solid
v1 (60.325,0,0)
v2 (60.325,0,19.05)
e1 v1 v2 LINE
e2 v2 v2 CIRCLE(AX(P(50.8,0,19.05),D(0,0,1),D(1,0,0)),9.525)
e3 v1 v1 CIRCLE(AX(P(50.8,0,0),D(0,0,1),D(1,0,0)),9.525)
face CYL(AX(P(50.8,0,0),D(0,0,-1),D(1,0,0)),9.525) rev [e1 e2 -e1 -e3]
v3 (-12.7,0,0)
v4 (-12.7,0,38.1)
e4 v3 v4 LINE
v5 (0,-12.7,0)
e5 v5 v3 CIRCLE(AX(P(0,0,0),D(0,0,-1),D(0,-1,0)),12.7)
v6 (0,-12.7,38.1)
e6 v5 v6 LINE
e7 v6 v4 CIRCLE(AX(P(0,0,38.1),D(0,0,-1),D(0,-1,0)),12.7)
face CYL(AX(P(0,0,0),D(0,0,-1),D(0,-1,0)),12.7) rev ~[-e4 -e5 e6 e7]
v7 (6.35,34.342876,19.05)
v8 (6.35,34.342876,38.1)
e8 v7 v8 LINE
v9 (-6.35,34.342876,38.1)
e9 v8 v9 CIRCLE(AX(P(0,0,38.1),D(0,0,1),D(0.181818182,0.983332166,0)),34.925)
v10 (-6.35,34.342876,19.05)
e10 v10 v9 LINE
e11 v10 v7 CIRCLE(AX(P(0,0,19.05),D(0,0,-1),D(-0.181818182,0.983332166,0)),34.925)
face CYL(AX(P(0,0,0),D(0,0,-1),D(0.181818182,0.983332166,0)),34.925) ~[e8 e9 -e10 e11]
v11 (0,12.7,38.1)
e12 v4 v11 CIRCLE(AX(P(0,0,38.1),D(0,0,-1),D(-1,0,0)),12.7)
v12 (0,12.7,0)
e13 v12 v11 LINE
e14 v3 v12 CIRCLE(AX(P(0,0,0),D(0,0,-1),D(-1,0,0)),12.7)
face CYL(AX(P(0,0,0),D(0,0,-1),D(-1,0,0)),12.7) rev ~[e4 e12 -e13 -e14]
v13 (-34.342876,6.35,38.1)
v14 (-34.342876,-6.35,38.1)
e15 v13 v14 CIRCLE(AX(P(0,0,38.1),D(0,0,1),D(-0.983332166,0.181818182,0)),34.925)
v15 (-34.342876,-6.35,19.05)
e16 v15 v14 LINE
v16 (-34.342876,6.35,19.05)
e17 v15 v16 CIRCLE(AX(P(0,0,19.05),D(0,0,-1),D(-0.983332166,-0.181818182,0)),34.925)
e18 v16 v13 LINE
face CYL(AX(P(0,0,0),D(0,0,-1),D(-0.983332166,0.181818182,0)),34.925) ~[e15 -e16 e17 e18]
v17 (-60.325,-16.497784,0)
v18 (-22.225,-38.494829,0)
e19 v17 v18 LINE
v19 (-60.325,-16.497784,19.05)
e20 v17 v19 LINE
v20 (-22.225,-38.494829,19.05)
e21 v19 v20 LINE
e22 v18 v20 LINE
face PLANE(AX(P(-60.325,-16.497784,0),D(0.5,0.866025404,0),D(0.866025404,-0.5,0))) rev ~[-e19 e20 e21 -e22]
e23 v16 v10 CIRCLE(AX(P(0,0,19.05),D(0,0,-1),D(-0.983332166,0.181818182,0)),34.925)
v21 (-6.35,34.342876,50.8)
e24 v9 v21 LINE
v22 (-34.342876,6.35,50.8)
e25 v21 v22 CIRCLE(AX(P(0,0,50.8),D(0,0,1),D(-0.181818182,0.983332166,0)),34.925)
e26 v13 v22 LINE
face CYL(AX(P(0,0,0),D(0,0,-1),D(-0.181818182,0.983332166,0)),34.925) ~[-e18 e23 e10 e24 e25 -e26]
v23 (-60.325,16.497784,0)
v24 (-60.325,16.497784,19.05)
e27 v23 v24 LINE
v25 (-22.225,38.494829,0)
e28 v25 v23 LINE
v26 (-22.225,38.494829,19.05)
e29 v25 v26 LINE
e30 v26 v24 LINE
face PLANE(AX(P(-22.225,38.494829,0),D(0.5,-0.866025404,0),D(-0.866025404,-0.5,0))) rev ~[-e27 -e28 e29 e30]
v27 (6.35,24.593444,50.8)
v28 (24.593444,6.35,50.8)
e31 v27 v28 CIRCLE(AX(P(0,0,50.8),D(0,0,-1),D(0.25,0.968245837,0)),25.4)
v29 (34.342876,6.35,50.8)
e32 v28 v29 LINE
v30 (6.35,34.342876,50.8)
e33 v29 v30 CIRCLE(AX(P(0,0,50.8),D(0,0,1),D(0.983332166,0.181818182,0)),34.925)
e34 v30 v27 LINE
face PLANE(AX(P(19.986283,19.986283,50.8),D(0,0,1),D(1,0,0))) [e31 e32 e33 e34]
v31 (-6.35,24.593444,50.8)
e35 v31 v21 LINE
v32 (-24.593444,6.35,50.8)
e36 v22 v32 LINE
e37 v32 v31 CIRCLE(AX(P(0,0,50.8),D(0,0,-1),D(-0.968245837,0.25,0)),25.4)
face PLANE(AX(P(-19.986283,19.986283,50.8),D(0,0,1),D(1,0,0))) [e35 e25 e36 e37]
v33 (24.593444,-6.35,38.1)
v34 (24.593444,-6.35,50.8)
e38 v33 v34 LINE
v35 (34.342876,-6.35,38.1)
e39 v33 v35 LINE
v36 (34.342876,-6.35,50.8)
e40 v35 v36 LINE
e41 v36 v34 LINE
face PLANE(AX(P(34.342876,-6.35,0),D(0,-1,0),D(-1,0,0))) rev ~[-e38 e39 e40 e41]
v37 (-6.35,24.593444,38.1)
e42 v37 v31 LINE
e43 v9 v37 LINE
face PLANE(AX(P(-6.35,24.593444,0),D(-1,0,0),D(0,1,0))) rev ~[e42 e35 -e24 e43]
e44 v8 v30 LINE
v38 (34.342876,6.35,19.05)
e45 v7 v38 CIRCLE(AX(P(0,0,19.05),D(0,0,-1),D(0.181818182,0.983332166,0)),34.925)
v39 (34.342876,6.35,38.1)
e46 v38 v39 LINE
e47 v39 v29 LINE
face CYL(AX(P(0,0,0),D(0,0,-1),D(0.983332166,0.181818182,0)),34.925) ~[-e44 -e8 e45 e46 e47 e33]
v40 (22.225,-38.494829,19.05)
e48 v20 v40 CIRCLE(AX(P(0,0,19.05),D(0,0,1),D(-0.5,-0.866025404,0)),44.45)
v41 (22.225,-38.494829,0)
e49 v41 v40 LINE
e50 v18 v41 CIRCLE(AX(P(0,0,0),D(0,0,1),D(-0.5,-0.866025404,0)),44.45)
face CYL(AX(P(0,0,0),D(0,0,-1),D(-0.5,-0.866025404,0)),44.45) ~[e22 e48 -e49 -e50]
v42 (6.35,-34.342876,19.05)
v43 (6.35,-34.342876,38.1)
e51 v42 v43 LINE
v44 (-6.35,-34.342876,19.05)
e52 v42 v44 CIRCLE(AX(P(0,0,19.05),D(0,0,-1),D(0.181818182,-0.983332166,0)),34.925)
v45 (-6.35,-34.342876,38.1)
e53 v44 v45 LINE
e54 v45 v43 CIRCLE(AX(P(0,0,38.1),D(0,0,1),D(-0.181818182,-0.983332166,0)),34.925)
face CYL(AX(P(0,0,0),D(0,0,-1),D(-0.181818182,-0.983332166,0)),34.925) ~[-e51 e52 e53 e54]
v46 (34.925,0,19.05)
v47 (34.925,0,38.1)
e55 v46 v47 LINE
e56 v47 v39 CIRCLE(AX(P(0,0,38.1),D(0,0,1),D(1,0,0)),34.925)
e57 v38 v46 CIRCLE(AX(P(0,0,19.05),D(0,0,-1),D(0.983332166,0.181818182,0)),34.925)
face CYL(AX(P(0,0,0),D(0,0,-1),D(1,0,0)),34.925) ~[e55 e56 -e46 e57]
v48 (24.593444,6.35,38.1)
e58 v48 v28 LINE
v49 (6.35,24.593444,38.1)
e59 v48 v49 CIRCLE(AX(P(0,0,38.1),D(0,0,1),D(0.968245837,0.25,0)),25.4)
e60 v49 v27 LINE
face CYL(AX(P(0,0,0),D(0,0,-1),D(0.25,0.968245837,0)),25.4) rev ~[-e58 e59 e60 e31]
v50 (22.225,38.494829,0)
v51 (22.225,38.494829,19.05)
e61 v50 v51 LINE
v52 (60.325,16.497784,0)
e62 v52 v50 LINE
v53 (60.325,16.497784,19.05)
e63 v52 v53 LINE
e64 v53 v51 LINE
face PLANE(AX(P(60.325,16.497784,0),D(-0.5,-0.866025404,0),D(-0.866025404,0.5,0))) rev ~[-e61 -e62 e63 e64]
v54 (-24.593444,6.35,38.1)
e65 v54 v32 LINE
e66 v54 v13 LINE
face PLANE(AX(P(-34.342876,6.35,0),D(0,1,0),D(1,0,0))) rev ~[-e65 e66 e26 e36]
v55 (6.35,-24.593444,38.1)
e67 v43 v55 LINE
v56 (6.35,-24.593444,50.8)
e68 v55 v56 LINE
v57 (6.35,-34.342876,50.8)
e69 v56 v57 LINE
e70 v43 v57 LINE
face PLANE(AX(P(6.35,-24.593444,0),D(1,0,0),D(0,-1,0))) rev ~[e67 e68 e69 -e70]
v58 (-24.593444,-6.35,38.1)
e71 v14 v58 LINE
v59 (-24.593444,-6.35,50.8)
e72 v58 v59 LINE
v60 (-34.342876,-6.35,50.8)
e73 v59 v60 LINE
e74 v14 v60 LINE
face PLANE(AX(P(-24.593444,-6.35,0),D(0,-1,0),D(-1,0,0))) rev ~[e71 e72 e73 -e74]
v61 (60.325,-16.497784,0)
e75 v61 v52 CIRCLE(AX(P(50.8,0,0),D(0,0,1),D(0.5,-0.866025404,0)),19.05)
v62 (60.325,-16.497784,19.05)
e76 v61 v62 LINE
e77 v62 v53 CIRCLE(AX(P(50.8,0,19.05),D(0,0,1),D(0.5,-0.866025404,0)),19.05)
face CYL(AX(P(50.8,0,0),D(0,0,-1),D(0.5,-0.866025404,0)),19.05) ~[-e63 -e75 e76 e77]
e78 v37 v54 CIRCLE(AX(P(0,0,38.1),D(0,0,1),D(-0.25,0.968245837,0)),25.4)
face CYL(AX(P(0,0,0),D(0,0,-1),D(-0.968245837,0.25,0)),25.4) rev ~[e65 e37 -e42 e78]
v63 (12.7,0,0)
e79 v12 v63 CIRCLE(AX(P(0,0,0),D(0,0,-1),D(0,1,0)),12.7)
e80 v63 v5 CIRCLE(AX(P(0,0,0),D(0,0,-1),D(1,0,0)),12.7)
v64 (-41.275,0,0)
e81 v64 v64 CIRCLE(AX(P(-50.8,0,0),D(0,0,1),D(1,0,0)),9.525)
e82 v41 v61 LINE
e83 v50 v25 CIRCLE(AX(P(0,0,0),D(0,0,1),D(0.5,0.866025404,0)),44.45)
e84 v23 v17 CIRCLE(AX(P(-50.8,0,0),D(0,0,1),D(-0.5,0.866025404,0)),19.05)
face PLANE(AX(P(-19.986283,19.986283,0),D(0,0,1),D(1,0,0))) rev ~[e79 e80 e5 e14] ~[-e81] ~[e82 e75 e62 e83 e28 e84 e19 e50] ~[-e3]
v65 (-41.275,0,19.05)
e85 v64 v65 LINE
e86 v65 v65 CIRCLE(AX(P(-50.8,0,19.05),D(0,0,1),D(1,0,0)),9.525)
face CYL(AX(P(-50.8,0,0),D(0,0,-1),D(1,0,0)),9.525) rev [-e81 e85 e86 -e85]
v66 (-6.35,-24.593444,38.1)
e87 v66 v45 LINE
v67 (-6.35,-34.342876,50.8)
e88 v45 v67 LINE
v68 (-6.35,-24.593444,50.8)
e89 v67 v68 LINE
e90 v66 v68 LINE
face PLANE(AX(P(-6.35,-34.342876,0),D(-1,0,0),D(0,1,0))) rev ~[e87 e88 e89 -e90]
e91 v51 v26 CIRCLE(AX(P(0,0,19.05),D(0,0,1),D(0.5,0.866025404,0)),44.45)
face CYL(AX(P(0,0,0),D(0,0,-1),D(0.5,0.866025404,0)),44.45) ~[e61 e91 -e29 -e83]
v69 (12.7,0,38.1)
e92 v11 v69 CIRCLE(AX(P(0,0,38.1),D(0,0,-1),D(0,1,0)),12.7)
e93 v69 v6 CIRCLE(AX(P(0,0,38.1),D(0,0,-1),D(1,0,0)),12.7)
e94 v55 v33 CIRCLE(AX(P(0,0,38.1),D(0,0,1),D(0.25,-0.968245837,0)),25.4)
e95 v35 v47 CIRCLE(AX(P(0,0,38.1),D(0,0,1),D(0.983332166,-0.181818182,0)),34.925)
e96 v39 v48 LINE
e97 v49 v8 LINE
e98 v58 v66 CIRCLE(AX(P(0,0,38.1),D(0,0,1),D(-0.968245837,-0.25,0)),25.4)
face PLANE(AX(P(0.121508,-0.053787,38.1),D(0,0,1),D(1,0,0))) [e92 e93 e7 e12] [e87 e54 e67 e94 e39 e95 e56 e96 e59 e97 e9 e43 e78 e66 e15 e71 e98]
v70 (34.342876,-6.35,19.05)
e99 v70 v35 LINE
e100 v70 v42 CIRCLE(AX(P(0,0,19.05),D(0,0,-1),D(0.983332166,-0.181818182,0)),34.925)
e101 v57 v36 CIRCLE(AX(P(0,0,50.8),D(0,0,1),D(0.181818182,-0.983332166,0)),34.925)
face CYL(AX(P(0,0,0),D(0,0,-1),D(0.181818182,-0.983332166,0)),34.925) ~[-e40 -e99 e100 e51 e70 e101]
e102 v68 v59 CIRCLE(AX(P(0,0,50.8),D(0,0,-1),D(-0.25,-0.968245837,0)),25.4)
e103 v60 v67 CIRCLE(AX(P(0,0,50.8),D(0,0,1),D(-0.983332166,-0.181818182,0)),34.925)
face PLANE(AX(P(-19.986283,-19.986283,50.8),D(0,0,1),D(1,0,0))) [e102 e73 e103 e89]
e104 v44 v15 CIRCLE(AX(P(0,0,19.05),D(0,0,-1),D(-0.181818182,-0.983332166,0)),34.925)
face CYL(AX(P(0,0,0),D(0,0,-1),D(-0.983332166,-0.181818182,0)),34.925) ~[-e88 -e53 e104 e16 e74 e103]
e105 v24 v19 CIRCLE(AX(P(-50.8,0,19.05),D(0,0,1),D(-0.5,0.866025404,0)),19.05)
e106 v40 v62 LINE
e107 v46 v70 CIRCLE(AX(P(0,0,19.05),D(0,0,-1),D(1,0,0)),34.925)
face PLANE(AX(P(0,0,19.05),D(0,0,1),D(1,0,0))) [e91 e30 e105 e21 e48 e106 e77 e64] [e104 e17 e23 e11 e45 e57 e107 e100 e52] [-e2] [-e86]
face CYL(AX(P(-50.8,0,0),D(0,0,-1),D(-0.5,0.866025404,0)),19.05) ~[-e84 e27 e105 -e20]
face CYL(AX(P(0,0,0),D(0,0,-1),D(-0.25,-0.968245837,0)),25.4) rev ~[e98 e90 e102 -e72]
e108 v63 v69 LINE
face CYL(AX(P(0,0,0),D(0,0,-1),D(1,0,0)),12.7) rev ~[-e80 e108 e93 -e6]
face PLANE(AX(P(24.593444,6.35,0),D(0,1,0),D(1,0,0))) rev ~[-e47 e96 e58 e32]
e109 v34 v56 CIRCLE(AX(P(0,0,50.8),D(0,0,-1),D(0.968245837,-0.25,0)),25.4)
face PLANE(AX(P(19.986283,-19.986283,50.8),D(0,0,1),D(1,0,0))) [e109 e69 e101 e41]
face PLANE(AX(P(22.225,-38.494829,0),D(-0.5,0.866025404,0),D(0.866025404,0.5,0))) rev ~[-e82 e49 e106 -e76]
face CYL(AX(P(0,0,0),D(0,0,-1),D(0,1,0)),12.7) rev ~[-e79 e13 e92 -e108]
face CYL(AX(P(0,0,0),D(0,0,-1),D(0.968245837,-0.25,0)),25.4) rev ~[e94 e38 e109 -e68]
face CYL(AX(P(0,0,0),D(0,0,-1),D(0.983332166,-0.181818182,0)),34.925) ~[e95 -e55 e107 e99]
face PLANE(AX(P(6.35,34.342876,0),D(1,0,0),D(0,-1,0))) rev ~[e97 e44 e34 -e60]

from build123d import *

# Parameters (mm, degrees)
F0_R     = 9.525
F1_DEPTH = 19.05
F2_DEPTH = 50.8
F3_DEPTH = 38.1


with BuildPart() as f1:
    # F0 (on Top) → F1 (new body)
    with BuildSketch(Plane.XY):
        with BuildLine():
            Line((-60.325, -16.4977839421), (-22.225, -38.4948291982))
            ThreePointArc((-22.225, -38.4948291982), (0, -44.45), (22.225, -38.4948291982))
            Line((22.225, -38.4948291982), (60.325, -16.4977839421))
            ThreePointArc((60.325, -16.4977839421), (69.85, 0), (60.325, 16.4977839421))
            Line((60.325, 16.4977839421), (22.225, 38.4948291982))
            ThreePointArc((22.225, 38.4948291982), (0, 44.45), (-22.225, 38.4948291982))
            Line((-22.225, 38.4948291982), (-60.325, 16.4977839421))
            ThreePointArc((-60.325, 16.4977839421), (-69.85, 0), (-60.325, -16.4977839421))
        make_face()
        with Locations((-50.8, 0)):
            Circle(F0_R, mode=Mode.SUBTRACT)
        with BuildLine():
            ThreePointArc((6.35, 34.3428758988), (24.6957043329, 24.6957043329), (34.3428758988, 6.35))
            ThreePointArc((34.3428758988, 6.35), (34.7791644937, 3.1883133656), (34.925, 0))
            ThreePointArc((34.925, 0), (34.7791644937, -3.1883133656), (34.3428758988, -6.35))
            ThreePointArc((34.3428758988, -6.35), (24.6957043329, -24.6957043329), (6.35, -34.3428758988))
            ThreePointArc((6.35, -34.3428758988), (0, -34.925), (-6.35, -34.3428758988))
            ThreePointArc((-6.35, -34.3428758988), (-24.6957043329, -24.6957043329), (-34.3428758988, -6.35))
            ThreePointArc((-34.3428758988, -6.35), (-34.925, 0), (-34.3428758988, 6.35))
            ThreePointArc((-34.3428758988, 6.35), (-24.6957043329, 24.6957043329), (-6.35, 34.3428758988))
            ThreePointArc((-6.35, 34.3428758988), (0, 34.925), (6.35, 34.3428758988))
        make_face(mode=Mode.SUBTRACT)
        with Locations((50.8, 0)):
            Circle(F0_R, mode=Mode.SUBTRACT)
    extrude(amount=F1_DEPTH)

    # F0 (on Top) → F2 (join)
    with BuildSketch(Plane.XY):
        with BuildLine():
            ThreePointArc((-24.5934442484, 6.35), (-17.9605122421, 17.9605122421), (-6.35, 24.5934442484))
            Line((-6.35, 24.5934442484), (-6.35, 34.3428758988))
            ThreePointArc((-6.35, 34.3428758988), (-24.6957043329, 24.6957043329), (-34.3428758988, 6.35))
            Line((-34.3428758988, 6.35), (-30.5676609278, 6.35))
            Line((-30.5676609278, 6.35), (-24.5934442484, 6.35))
        make_face()
        with BuildLine():
            Line((-6.35, -34.3428758988), (-6.35, -24.5934442484))
            ThreePointArc((-6.35, -24.5934442484), (-17.9605122421, -17.9605122421), (-24.5934442484, -6.35))
            Line((-24.5934442484, -6.35), (-34.3428758988, -6.35))
            ThreePointArc((-34.3428758988, -6.35), (-24.6957043329, -24.6957043329), (-6.35, -34.3428758988))
        make_face()
        with BuildLine():
            Line((25.4, -6.35), (24.5934442484, -6.35))
            ThreePointArc((24.5934442484, -6.35), (17.9605122421, -17.9605122421), (6.35, -24.5934442484))
            Line((6.35, -24.5934442484), (6.35, -29.9044754356))
            Line((6.35, -29.9044754356), (6.35, -34.3428758988))
            ThreePointArc((6.35, -34.3428758988), (24.6957043329, -24.6957043329), (34.3428758988, -6.35))
            Line((34.3428758988, -6.35), (25.4, -6.35))
        make_face()
        with BuildLine():
            ThreePointArc((6.35, 24.5934442484), (17.9605122421, 17.9605122421), (24.5934442484, 6.35))
            Line((24.5934442484, 6.35), (34.3428758988, 6.35))
            ThreePointArc((34.3428758988, 6.35), (24.6957043329, 24.6957043329), (6.35, 34.3428758988))
            Line((6.35, 34.3428758988), (6.35, 25.4))
            Line((6.35, 25.4), (6.35, 24.5934442484))
        make_face()
    extrude(amount=F2_DEPTH)

    # F0 (on Top) → F3 (join)
    with BuildSketch(Plane.XY):
        with BuildLine():
            ThreePointArc((24.5934442484, -6.35), (25.1975542852, -3.2005090291), (25.4, 0))
            ThreePointArc((25.4, 0), (25.1975542852, 3.2005090291), (24.5934442484, 6.35))
            ThreePointArc((24.5934442484, 6.35), (17.9605122421, 17.9605122421), (6.35, 24.5934442484))
            ThreePointArc((6.35, 24.5934442484), (0, 25.4), (-6.35, 24.5934442484))
            ThreePointArc((-6.35, 24.5934442484), (-17.9605122421, 17.9605122421), (-24.5934442484, 6.35))
            ThreePointArc((-24.5934442484, 6.35), (-25.4, 0), (-24.5934442484, -6.35))
            ThreePointArc((-24.5934442484, -6.35), (-17.9605122421, -17.9605122421), (-6.35, -24.5934442484))
            ThreePointArc((-6.35, -24.5934442484), (0, -25.4), (6.35, -24.5934442484))
            ThreePointArc((6.35, -24.5934442484), (17.9605122421, -17.9605122421), (24.5934442484, -6.35))
        make_face()
        with BuildLine():
            ThreePointArc((0, 12.7), (8.9802561211, 8.9802561211), (12.7, 0))
            ThreePointArc((12.7, 0), (8.9802561211, -8.9802561211), (0, -12.7))
            ThreePointArc((0, -12.7), (-8.9802561211, -8.9802561211), (-12.7, 0))
            ThreePointArc((-12.7, 0), (-8.9802561211, 8.9802561211), (0, 12.7))
        make_face(mode=Mode.SUBTRACT)
        with BuildLine():
            ThreePointArc((24.5934442484, 6.35), (25.1975542852, 3.2005090291), (25.4, 0))
            ThreePointArc((25.4, 0), (25.1975542852, -3.2005090291), (24.5934442484, -6.35))
            Line((24.5934442484, -6.35), (25.4, -6.35))
            Line((25.4, -6.35), (34.3428758988, -6.35))
            ThreePointArc((34.3428758988, -6.35), (34.7791644937, -3.1883133656), (34.925, 0))
            ThreePointArc((34.925, 0), (34.7791644937, 3.1883133656), (34.3428758988, 6.35))
            Line((34.3428758988, 6.35), (24.5934442484, 6.35))
        make_face()
        with BuildLine():
            ThreePointArc((-6.35, 24.5934442484), (0, 25.4), (6.35, 24.5934442484))
            Line((6.35, 24.5934442484), (6.35, 25.4))
            Line((6.35, 25.4), (6.35, 34.3428758988))
            ThreePointArc((6.35, 34.3428758988), (0, 34.925), (-6.35, 34.3428758988))
            Line((-6.35, 34.3428758988), (-6.35, 24.5934442484))
        make_face()
        with BuildLine():
            Line((6.35, -29.9044754356), (6.35, -24.5934442484))
            ThreePointArc((6.35, -24.5934442484), (0, -25.4), (-6.35, -24.5934442484))
            Line((-6.35, -24.5934442484), (-6.35, -34.3428758988))
            ThreePointArc((-6.35, -34.3428758988), (0, -34.925), (6.35, -34.3428758988))
            Line((6.35, -34.3428758988), (6.35, -29.9044754356))
        make_face()
        with BuildLine():
            ThreePointArc((-24.5934442484, -6.35), (-25.4, 0), (-24.5934442484, 6.35))
            Line((-24.5934442484, 6.35), (-30.5676609278, 6.35))
            Line((-30.5676609278, 6.35), (-34.3428758988, 6.35))
            ThreePointArc((-34.3428758988, 6.35), (-34.925, 0), (-34.3428758988, -6.35))
            Line((-34.3428758988, -6.35), (-24.5934442484, -6.35))
        make_face()
    extrude(amount=F3_DEPTH)


solid = f1.part
